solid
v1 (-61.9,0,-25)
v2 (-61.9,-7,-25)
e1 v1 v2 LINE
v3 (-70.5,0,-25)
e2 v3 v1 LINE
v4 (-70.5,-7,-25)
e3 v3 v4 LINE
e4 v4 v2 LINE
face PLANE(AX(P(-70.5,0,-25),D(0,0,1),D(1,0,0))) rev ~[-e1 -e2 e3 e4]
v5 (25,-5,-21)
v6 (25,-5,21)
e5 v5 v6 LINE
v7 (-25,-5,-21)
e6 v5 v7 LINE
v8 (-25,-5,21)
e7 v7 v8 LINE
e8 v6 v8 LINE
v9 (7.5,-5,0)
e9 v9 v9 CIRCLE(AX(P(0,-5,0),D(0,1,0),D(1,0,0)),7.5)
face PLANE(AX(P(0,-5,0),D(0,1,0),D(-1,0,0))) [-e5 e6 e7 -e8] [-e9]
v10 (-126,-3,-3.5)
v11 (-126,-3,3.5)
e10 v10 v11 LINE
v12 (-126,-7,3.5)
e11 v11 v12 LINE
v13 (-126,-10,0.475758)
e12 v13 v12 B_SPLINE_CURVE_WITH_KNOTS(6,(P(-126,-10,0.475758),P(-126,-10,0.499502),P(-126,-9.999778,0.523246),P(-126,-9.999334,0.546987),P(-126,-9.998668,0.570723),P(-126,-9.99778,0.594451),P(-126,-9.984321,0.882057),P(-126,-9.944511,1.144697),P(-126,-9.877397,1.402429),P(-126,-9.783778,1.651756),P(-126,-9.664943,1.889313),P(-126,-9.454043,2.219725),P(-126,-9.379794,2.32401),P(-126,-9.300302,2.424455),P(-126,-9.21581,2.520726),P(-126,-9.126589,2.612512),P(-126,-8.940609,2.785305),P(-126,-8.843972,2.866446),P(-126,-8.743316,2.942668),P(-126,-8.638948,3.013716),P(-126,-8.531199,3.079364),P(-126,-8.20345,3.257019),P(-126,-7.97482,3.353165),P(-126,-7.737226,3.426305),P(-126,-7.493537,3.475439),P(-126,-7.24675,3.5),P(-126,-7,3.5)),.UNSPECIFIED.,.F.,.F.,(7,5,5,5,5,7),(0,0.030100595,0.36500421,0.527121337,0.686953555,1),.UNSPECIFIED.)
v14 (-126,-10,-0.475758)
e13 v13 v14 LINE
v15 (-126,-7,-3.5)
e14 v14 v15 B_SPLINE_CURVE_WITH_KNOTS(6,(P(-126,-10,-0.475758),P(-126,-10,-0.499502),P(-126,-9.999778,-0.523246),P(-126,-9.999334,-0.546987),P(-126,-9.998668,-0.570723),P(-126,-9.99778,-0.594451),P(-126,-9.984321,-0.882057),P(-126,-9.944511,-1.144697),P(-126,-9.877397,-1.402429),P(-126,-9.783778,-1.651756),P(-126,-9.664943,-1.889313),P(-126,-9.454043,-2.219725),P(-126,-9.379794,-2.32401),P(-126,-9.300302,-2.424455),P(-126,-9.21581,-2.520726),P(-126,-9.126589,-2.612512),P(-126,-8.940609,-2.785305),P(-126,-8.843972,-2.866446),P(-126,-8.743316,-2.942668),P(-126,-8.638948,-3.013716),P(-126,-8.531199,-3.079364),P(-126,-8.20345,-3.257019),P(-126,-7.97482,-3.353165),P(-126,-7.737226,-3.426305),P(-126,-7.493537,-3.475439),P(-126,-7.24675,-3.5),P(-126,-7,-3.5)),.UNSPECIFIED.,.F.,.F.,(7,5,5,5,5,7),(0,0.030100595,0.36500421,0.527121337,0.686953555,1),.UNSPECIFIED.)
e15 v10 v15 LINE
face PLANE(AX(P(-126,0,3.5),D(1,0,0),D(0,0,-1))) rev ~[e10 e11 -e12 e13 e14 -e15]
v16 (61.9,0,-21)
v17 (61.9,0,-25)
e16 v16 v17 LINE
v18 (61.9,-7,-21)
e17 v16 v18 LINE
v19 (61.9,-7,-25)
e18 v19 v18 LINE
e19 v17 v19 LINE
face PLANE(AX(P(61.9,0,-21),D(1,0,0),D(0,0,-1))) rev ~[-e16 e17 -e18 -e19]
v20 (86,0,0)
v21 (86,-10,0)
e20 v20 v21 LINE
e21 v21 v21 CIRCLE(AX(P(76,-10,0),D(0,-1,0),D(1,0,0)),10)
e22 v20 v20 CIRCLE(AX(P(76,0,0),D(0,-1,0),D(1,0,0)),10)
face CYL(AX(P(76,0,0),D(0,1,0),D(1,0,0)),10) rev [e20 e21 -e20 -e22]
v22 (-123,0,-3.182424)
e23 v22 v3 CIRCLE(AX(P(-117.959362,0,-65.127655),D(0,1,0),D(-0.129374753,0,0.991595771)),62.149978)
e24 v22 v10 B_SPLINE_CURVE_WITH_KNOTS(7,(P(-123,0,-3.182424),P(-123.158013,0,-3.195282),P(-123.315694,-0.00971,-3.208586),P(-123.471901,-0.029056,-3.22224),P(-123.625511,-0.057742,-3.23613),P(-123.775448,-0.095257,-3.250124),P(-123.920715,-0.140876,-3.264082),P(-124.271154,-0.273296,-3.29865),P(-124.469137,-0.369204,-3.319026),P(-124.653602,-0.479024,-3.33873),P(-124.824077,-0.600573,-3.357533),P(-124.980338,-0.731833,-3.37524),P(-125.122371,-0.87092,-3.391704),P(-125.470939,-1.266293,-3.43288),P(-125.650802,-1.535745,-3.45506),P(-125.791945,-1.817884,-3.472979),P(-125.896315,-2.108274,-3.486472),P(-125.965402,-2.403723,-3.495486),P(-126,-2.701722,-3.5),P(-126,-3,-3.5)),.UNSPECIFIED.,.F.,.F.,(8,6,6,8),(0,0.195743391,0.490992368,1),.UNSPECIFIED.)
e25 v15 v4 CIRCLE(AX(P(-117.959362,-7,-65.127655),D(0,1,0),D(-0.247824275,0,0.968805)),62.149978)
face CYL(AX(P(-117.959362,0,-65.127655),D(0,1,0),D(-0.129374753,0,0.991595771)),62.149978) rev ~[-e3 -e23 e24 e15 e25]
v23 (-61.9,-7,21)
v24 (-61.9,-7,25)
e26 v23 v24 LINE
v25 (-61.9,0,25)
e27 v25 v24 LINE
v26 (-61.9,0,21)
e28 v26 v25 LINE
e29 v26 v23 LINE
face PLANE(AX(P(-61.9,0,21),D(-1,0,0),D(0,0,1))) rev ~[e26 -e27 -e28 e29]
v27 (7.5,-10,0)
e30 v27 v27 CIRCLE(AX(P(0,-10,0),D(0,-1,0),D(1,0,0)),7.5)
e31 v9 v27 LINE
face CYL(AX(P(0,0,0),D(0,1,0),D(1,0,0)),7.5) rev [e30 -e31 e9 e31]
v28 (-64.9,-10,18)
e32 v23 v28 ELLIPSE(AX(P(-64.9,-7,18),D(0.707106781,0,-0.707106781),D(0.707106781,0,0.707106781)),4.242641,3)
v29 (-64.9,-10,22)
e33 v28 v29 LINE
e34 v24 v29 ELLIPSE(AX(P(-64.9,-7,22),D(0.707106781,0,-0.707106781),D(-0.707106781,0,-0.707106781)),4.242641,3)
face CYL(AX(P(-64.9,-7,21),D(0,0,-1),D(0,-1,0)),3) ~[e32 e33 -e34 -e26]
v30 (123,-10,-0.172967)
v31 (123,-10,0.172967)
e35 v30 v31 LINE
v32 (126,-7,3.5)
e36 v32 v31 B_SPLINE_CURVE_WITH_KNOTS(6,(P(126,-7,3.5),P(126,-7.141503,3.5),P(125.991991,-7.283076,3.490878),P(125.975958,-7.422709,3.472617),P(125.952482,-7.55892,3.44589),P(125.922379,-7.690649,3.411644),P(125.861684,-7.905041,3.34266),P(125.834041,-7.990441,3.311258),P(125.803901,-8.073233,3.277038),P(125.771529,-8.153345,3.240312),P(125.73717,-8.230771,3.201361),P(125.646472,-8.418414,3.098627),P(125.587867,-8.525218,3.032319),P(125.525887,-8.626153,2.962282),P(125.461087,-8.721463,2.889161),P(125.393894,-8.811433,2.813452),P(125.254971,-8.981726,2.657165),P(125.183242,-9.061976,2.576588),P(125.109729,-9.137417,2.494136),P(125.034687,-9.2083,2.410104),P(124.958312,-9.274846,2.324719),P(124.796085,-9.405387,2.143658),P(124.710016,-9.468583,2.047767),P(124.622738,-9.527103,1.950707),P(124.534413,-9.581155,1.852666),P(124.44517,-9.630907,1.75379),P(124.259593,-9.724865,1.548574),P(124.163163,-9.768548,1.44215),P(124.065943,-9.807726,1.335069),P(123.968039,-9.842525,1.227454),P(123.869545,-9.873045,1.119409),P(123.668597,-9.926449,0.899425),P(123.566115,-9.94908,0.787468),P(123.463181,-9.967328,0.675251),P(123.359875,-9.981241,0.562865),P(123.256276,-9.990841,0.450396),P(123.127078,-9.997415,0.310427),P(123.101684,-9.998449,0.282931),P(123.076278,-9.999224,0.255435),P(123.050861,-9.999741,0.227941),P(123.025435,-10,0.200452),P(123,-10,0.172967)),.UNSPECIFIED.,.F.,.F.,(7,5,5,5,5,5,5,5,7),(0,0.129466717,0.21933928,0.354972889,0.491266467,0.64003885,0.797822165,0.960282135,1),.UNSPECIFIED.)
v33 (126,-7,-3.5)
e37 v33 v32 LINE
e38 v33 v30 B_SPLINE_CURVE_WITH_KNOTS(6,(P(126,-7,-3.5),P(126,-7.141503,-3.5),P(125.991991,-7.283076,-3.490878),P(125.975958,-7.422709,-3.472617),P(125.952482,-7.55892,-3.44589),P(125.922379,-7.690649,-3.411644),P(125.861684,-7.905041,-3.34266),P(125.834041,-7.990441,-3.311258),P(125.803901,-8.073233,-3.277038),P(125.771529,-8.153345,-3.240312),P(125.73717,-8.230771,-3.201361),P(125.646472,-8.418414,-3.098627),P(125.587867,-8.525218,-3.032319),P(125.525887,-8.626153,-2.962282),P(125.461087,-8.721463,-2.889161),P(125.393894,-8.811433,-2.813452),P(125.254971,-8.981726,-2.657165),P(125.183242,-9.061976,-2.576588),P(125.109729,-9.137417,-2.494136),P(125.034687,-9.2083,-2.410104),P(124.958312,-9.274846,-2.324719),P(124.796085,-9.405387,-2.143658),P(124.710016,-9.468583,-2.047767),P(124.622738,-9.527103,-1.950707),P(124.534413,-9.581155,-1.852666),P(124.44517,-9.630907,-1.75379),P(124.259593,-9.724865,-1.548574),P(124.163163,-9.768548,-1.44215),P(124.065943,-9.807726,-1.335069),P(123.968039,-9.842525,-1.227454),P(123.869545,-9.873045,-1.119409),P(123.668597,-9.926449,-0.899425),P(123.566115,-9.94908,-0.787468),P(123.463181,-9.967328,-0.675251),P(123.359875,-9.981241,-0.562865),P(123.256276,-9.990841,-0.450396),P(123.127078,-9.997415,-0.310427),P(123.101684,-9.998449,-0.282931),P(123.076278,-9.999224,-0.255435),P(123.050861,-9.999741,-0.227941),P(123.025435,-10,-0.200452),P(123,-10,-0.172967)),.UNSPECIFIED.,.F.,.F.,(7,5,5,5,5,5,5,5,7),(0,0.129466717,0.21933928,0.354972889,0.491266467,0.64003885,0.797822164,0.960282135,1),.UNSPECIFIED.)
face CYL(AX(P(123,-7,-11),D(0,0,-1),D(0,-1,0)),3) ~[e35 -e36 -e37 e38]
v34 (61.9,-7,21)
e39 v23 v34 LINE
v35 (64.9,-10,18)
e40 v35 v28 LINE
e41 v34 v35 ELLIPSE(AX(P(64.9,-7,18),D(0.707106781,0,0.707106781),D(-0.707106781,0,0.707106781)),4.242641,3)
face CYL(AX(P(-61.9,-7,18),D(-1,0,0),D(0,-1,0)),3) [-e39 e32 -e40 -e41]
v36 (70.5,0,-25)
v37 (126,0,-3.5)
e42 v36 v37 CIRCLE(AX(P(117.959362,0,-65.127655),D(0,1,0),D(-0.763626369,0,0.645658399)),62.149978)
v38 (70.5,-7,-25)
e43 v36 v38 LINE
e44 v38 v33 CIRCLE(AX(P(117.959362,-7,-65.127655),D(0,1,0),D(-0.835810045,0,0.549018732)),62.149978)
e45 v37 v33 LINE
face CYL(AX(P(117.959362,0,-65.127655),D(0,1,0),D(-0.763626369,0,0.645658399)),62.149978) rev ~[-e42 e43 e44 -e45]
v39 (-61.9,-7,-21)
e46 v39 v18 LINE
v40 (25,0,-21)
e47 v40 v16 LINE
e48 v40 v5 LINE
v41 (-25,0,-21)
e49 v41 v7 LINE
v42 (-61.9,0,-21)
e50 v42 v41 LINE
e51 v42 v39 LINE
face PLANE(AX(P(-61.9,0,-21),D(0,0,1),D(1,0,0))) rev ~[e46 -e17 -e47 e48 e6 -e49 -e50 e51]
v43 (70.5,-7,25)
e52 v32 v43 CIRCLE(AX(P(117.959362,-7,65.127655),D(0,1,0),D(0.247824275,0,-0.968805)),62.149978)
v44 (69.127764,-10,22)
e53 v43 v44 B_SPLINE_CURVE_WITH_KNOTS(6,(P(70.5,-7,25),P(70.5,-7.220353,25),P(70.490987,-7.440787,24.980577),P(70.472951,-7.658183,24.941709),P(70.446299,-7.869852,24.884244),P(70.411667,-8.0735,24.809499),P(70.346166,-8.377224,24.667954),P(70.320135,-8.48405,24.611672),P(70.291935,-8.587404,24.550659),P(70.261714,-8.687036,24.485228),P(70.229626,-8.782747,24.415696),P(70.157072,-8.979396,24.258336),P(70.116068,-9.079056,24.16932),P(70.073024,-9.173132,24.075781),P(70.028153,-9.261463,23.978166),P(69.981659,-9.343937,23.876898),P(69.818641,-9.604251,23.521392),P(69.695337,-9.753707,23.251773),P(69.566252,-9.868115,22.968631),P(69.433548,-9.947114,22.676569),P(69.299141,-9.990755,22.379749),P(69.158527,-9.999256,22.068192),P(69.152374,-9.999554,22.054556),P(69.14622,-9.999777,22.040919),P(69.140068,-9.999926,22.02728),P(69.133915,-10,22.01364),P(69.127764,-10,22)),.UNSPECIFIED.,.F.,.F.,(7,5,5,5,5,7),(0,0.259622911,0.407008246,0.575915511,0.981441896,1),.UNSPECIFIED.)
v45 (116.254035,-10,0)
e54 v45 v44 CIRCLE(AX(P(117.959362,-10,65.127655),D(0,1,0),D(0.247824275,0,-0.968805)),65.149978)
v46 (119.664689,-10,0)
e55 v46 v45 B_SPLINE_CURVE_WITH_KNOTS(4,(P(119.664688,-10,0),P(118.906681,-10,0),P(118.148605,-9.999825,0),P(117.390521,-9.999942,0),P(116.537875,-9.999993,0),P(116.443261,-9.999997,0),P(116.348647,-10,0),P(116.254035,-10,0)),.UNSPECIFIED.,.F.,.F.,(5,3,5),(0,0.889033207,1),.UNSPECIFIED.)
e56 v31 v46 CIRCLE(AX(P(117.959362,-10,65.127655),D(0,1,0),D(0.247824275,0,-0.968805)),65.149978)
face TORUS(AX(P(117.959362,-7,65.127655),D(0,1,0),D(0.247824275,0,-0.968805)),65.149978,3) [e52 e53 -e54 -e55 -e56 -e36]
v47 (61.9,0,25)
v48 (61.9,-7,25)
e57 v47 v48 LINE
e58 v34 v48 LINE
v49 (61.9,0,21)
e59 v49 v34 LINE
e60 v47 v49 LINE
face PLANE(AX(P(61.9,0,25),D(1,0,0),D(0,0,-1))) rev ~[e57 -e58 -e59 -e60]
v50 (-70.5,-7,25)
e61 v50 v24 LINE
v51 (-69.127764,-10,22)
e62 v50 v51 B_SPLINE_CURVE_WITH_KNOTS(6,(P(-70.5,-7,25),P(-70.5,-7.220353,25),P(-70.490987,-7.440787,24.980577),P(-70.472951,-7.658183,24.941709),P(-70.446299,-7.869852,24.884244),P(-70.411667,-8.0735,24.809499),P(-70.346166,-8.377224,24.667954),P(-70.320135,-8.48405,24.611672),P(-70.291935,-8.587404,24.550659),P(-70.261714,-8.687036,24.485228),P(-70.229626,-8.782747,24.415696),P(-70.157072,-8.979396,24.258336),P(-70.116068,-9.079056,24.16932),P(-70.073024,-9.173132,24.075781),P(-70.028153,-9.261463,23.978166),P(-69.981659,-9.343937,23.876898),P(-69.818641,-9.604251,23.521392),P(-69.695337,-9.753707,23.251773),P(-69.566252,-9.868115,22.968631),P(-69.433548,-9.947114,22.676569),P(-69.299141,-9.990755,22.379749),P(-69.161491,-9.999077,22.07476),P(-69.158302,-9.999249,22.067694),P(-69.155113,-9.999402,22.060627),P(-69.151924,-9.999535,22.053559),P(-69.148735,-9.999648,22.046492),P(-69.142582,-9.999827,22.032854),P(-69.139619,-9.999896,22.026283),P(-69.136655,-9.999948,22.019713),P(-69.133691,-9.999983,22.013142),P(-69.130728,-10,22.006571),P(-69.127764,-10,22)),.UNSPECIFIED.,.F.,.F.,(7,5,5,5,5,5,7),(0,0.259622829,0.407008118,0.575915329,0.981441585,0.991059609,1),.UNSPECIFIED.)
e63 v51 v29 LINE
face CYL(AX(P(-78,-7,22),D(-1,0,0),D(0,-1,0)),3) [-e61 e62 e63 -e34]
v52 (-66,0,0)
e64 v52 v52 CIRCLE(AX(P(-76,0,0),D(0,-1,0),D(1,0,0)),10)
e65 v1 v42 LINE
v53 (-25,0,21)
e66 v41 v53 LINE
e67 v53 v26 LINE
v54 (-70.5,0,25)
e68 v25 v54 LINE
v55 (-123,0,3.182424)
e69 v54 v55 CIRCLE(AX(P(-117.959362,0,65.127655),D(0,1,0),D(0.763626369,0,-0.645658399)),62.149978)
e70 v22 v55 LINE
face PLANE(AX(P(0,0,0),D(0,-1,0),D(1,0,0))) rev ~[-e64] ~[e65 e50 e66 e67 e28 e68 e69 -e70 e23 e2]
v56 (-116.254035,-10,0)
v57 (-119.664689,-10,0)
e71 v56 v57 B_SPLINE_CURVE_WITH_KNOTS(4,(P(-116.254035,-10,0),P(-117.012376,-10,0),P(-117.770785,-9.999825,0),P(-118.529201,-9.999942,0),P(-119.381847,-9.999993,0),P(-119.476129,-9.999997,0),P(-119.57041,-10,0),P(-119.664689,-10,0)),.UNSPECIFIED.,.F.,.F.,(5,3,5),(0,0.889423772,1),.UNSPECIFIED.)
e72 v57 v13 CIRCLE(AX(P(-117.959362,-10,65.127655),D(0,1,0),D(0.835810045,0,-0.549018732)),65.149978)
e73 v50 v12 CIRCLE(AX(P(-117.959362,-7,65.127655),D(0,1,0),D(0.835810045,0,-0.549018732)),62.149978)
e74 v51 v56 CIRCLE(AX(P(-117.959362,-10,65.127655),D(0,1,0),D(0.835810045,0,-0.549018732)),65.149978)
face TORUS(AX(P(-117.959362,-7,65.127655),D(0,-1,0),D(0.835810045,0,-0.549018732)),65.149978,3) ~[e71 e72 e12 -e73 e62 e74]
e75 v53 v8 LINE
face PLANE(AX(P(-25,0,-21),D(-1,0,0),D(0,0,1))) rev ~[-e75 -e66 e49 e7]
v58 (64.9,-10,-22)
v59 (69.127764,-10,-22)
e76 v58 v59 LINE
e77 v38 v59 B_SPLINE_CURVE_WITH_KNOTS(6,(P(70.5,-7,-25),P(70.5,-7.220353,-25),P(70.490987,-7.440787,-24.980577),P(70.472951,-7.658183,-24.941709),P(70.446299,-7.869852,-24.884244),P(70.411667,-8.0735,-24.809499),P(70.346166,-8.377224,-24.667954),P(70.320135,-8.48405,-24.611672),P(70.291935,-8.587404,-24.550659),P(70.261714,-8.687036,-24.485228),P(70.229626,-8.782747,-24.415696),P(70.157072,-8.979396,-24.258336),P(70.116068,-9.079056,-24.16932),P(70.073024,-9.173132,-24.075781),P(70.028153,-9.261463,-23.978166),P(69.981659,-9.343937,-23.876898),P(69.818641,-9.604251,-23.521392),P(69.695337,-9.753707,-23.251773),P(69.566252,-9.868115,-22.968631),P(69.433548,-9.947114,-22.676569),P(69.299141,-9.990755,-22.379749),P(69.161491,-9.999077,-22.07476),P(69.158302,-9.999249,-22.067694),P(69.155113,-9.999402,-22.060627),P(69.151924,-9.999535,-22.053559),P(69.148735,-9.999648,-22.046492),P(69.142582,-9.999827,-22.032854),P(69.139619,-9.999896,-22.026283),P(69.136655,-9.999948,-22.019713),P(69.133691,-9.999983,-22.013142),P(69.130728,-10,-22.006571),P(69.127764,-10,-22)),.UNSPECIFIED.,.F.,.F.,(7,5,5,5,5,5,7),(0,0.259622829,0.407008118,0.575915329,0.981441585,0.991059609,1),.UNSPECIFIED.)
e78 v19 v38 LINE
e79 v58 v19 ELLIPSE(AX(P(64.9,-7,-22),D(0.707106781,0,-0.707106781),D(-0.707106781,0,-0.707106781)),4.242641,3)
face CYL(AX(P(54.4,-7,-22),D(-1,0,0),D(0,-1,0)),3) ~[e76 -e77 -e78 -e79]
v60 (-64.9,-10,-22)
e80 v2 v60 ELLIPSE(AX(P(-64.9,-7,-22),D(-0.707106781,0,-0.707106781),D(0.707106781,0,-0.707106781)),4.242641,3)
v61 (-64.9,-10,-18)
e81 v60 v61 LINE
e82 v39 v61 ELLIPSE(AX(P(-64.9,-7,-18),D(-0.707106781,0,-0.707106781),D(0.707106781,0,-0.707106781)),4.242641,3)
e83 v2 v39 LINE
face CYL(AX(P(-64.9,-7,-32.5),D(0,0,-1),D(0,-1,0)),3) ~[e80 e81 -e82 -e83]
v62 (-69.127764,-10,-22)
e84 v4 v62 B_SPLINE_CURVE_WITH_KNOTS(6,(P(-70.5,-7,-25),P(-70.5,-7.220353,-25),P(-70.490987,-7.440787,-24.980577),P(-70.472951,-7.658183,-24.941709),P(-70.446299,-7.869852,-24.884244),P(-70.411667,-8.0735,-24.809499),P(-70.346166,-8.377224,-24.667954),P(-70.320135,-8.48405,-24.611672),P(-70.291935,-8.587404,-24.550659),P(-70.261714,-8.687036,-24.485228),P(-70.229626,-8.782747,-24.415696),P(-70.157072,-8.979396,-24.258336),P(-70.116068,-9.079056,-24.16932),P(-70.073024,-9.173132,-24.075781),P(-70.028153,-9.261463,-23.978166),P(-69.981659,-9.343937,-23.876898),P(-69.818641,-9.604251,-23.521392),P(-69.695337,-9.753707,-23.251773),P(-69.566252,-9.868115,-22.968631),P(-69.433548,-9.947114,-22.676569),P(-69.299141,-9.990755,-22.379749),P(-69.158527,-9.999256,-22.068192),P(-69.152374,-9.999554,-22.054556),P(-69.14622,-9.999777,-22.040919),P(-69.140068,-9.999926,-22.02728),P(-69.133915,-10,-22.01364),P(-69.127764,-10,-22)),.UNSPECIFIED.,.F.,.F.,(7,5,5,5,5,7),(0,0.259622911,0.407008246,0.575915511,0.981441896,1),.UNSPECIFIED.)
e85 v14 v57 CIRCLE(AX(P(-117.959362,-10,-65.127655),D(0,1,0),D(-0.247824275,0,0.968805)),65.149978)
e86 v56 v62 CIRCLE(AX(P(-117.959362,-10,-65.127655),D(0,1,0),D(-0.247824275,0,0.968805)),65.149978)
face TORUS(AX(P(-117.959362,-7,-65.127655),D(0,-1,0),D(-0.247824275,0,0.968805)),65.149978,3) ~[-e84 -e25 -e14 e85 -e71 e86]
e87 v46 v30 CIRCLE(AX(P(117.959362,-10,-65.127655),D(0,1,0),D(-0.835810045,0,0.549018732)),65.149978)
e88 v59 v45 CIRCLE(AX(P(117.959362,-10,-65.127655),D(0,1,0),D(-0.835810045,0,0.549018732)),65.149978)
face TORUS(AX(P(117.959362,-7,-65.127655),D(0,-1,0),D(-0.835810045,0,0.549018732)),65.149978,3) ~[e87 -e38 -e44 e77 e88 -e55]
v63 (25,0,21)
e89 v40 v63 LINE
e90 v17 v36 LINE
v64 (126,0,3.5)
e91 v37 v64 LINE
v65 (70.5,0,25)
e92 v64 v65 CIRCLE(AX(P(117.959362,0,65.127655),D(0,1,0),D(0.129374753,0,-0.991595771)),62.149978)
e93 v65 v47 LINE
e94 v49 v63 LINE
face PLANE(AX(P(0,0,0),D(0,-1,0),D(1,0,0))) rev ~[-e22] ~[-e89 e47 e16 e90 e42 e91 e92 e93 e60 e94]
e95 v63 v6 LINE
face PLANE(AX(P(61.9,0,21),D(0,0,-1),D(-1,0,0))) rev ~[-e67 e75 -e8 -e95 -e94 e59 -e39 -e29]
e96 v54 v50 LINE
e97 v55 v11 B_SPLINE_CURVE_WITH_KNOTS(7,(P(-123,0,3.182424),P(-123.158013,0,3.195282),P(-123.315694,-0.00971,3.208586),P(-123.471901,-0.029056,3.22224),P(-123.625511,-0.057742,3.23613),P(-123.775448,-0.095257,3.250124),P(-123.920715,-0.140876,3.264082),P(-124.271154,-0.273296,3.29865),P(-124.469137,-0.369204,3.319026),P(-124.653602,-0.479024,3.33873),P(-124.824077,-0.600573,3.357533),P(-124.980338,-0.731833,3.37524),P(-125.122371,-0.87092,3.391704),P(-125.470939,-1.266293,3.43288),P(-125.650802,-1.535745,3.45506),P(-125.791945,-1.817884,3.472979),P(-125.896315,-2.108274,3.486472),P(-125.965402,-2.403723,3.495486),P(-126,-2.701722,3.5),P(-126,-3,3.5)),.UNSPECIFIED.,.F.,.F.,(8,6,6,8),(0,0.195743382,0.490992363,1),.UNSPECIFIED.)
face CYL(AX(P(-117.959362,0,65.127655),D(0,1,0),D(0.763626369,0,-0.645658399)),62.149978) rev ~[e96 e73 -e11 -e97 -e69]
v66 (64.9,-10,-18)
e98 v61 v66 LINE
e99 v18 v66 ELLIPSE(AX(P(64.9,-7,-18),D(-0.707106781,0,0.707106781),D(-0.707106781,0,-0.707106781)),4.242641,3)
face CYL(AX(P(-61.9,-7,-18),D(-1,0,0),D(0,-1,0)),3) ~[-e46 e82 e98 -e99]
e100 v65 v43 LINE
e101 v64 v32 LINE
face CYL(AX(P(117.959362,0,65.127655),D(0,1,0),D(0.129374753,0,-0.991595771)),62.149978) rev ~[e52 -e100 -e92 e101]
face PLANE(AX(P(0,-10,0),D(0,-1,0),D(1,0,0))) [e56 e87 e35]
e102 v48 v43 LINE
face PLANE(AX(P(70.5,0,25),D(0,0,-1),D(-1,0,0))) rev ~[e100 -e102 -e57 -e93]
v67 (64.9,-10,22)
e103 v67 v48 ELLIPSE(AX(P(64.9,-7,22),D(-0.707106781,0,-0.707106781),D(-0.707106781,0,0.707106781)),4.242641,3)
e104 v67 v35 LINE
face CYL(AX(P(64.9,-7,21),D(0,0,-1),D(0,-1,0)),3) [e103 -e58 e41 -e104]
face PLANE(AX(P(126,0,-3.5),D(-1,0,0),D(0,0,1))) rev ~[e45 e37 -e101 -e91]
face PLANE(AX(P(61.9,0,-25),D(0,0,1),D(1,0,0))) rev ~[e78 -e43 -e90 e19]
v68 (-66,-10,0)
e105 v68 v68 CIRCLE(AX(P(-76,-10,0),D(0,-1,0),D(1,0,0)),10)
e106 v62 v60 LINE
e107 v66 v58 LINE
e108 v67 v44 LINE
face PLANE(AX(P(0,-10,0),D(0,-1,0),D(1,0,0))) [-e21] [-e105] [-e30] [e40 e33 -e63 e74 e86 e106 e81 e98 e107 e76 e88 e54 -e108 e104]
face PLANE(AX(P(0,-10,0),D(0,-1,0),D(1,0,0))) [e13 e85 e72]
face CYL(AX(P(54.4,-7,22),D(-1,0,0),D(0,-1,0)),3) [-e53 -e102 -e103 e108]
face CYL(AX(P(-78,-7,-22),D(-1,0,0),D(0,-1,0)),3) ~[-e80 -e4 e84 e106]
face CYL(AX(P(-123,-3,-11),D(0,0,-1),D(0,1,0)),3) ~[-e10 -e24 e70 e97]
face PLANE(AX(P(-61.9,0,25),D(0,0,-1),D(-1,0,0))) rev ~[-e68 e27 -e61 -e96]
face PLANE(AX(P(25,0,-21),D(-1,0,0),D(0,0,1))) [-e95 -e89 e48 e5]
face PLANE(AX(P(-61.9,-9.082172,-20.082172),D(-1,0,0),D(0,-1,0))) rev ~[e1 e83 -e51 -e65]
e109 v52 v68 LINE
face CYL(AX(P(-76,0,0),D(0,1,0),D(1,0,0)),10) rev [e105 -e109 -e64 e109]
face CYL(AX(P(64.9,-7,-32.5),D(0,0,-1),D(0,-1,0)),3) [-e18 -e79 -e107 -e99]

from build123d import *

# Parameters (mm, degrees)
F0_R         = 10
F0_R_2       = 7.5
F1_DEPTH     = 10
F2_W         = 50
F2_H         = 42
F2_R         = 7.5
F3_DEPTH     = 5
F4_T1_DEPTH  = 123.8
F4_T3_DEPTH  = 11.5
F4_T5_DEPTH  = 23.6
F4_T7_DEPTH  = 22
F4_T9_DEPTH  = 11.5
F4_T11_DEPTH = 23.6
F4_T14_ANGLE = 71.0490813257
F4_T16_ANGLE = 71.0490813257
F4_T18_ANGLE = 71.0490813257
F4_T20_ANGLE = 71.0490813257
F4_T25_DEPTH = 19
F4_T29_DEPTH = 131.3
F4_T36_DEPTH = 131.3
F4_T40_DEPTH = 19
F4_T47_DEPTH = 19
F4_T51_DEPTH = 131.3
F4_T58_DEPTH = 131.3
F4_T62_DEPTH = 19


# Not quite as in the source:
# - a fillet or chamfer that OpenCascade refuses, or shapes differently, is made with other operations: its cross-section is extruded or revolved along the edge and cut away or added


with BuildPart() as f1:
    # F0 (on Front) → F1 (new body)
    with BuildSketch(Plane.XZ):
        with BuildLine():
            ThreePointArc((126, 3.5), (95.5089399385, 7.1742403064), (70.5, 25))
            Line((70.5, 25), (61.9, 25))
            Line((61.9, 25), (61.9, 21))
            Line((61.9, 21), (-61.9, 21))
            Line((-61.9, 21), (-61.9, 25))
            Line((-61.9, 25), (-70.5, 25))
            ThreePointArc((-70.5, 25), (-95.5089399385, 7.1742403064), (-126, 3.5))
            Line((-126, 3.5), (-126, -3.5))
            ThreePointArc((-126, -3.5), (-95.5089399385, -7.1742403064), (-70.5, -25))
            Line((-70.5, -25), (-61.9, -25))
            Line((-61.9, -25), (-61.9, -21))
            Line((-61.9, -21), (61.9, -21))
            Line((61.9, -21), (61.9, -25))
            Line((61.9, -25), (70.5, -25))
            ThreePointArc((70.5, -25), (95.5089399385, -7.1742403064), (126, -3.5))
            Line((126, -3.5), (126, 3.5))
        make_face()
        with Locations((-76, 0)):
            Circle(F0_R, mode=Mode.SUBTRACT)
        Circle(F0_R_2, mode=Mode.SUBTRACT)
        with Locations((76, 0)):
            Circle(F0_R, mode=Mode.SUBTRACT)
    extrude(amount=F1_DEPTH)

    # F2 (on face) → F3 (cut)
    with BuildSketch(Plane(origin=(0, 0, 0), x_dir=(-1, 0, 0), z_dir=(0, 1, 0))):
        Rectangle(F2_W, F2_H)
        Circle(F2_R, mode=Mode.SUBTRACT)
    extrude(amount=-F3_DEPTH, mode=Mode.SUBTRACT)

    # F4: fillet of radius 3 on 16 edges, made by hand

    # F4_s2 → F4_t1 (cut)
    with BuildSketch(Plane.YZ.offset(-61.9)):
        with BuildLine():
            ThreePointArc((-10, -18), (-9.1213203436, -20.1213203436), (-7, -21))
            Line((-7, -21), (-10, -21))
            Line((-10, -21), (-10, -18))
        make_face()
        with BuildLine():
            ThreePointArc((-10, 18), (-9.1213203436, 20.1213203436), (-7, 21))
            Line((-7, 21), (-10, 21))
            Line((-10, 21), (-10, 18))
        make_face()
    extrude(amount=F4_T1_DEPTH, mode=Mode.SUBTRACT)

    # F4_s4 → F4_t3 (cut)
    with BuildSketch(Plane.XY.offset(-32.5)):
        with BuildLine():
            ThreePointArc((64.9, -10), (62.7786796564, -9.1213203436), (61.9, -7))
            Line((61.9, -7), (61.9, -10))
            Line((61.9, -10), (64.9, -10))
        make_face()
        with BuildLine():
            ThreePointArc((-64.9, -10), (-62.7786796564, -9.1213203436), (-61.9, -7))
            Line((-61.9, -7), (-61.9, -10))
            Line((-61.9, -10), (-64.9, -10))
        make_face()
    extrude(amount=F4_T3_DEPTH, mode=Mode.SUBTRACT)

    # F4_s6 → F4_t5 (cut)
    with BuildSketch(Plane.YZ.offset(54.4)):
        with BuildLine():
            ThreePointArc((-10, -22), (-9.1213203436, -24.1213203436), (-7, -25))
            Line((-7, -25), (-10, -25))
            Line((-10, -25), (-10, -22))
        make_face()
        with BuildLine():
            ThreePointArc((-10, 22), (-9.1213203436, 24.1213203436), (-7, 25))
            Line((-7, 25), (-10, 25))
            Line((-10, 25), (-10, 22))
        make_face()
    extrude(amount=F4_T5_DEPTH, mode=Mode.SUBTRACT)

    # F4_s8 → F4_t7 (cut)
    with BuildSketch(Plane.XY.offset(-11)):
        with BuildLine():
            ThreePointArc((123, -10), (125.1213203436, -9.1213203436), (126, -7))
            Line((126, -7), (126, -10))
            Line((126, -10), (123, -10))
        make_face()
        with BuildLine():
            ThreePointArc((-123, 0), (-125.1213203436, -0.8786796564), (-126, -3))
            Line((-126, -3), (-126, 0))
            Line((-126, 0), (-123, 0))
        make_face()
    extrude(amount=F4_T7_DEPTH, mode=Mode.SUBTRACT)

    # F4_s10 → F4_t9 (cut)
    with BuildSketch(Plane.XY.offset(21)):
        with BuildLine():
            ThreePointArc((64.9, -10), (62.7786796564, -9.1213203436), (61.9, -7))
            Line((61.9, -7), (61.9, -10))
            Line((61.9, -10), (64.9, -10))
        make_face()
        with BuildLine():
            ThreePointArc((-64.9, -10), (-62.7786796564, -9.1213203436), (-61.9, -7))
            Line((-61.9, -7), (-61.9, -10))
            Line((-61.9, -10), (-64.9, -10))
        make_face()
    extrude(amount=F4_T9_DEPTH, mode=Mode.SUBTRACT)

    # F4_s12 → F4_t11 (cut)
    with BuildSketch(Plane.YZ.offset(-78)):
        with BuildLine():
            ThreePointArc((-10, 22), (-9.1213203436, 24.1213203436), (-7, 25))
            Line((-7, 25), (-10, 25))
            Line((-10, 25), (-10, 22))
        make_face()
        with BuildLine():
            ThreePointArc((-10, -22), (-9.1213203436, -24.1213203436), (-7, -25))
            Line((-7, -25), (-10, -25))
            Line((-10, -25), (-10, -22))
        make_face()
    extrude(amount=F4_T11_DEPTH, mode=Mode.SUBTRACT)

    # F4_s13 → F4_t14 (revolve, cut)
    with BuildSketch(Plane(origin=(5.6700188901, 0, 8.6318707647), x_dir=(0, 1, 0), z_dir=(-0.5490187323, 0, -0.8358100452))):
        with BuildLine():
            ThreePointArc((-10, 69.1979444633), (-9.1213203436, 71.3192648069), (-7, 72.1979444633))
            Line((-7, 72.1979444633), (-10, 72.1979444633))
            Line((-10, 72.1979444633), (-10, 69.1979444633))
        make_face()
    revolve(axis=Axis((117.9593619468, -10, -65.127655258), (0, 1, 0)), revolution_arc=F4_T14_ANGLE, mode=Mode.SUBTRACT)

    # F4_s15 → F4_t16 (revolve, cut)
    with BuildSketch(Plane(origin=(126.3513869763, 0, 32.3212006938), x_dir=(0, 1, 0), z_dir=(0.9688050004, 0, 0.2478242748))):
        with BuildLine():
            ThreePointArc((-7, -28.2871731549), (-9.1213203436, -29.1658528113), (-10, -31.2871731549))
            Line((-10, -31.2871731549), (-10, -28.2871731549))
            Line((-10, -28.2871731549), (-7, -28.2871731549))
        make_face()
    revolve(axis=Axis((117.9593619468, -10, 65.127655258), (0, 1, 0)), revolution_arc=F4_T16_ANGLE, mode=Mode.SUBTRACT)

    # F4_s17 → F4_t18 (revolve, cut)
    with BuildSketch(Plane(origin=(-5.6700188901, 0, -8.6318707647), x_dir=(0, 1, 0), z_dir=(0.5490187323, 0, 0.8358100452))):
        with BuildLine():
            ThreePointArc((-10, 69.1979444633), (-9.1213203436, 71.3192648069), (-7, 72.1979444633))
            Line((-7, 72.1979444633), (-10, 72.1979444633))
            Line((-10, 72.1979444633), (-10, 69.1979444633))
        make_face()
    revolve(axis=Axis((-117.9593619468, -10, 65.127655258), (0, 1, 0)), revolution_arc=F4_T18_ANGLE, mode=Mode.SUBTRACT)

    # F4_s19 → F4_t20 (revolve, cut)
    with BuildSketch(Plane(origin=(-126.3513869763, 0, -32.3212006938), x_dir=(0, 1, 0), z_dir=(-0.9688050004, 0, -0.2478242748))):
        with BuildLine():
            ThreePointArc((-10, -31.2871731549), (-9.1213203436, -29.1658528113), (-7, -28.2871731549))
            Line((-7, -28.2871731549), (-10, -28.2871731549))
            Line((-10, -28.2871731549), (-10, -31.2871731549))
        make_face()
    revolve(axis=Axis((-117.9593619468, -10, -65.127655258), (0, 1, 0)), revolution_arc=F4_T20_ANGLE, mode=Mode.SUBTRACT)


with BuildPart() as f4_tool23:
    # F4_s24 → F4_t25 (new body)
    with BuildSketch(Plane.XY.offset(-32.5)):
        with BuildLine():
            ThreePointArc((-64.9, -10), (-62.7786796564, -9.1213203436), (-61.9, -7))
            Line((-61.9, -7), (-61.9, -10))
            Line((-61.9, -10), (-64.9, -10))
        make_face()
    extrude(amount=F4_T25_DEPTH)

    split(bisect_by=Plane.XY.offset(-21), keep=Keep.TOP)


with BuildPart() as f4_tool27:
    # F4_s28 → F4_t29 (new body)
    with BuildSketch(Plane.YZ.offset(-69.4)):
        with BuildLine():
            ThreePointArc((-10, -18), (-9.1213203436, -20.1213203436), (-7, -21))
            Line((-7, -21), (-10, -21))
            Line((-10, -21), (-10, -18))
        make_face()
    extrude(amount=F4_T29_DEPTH)

    split(bisect_by=Plane.YZ.offset(-61.9), keep=Keep.BOTTOM)


with BuildPart() as f4_tool23_1:
    add(f4_tool23.part)

    # F4_t31: intersect F4_tool27
    add(f4_tool27.part, mode=Mode.INTERSECT)


with BuildPart() as f1_1:
    add(f1.part)

    # F4_t21: cut F4_tool23
    add(f4_tool23_1.part, mode=Mode.SUBTRACT)


with BuildPart() as f4_tool34:
    # F4_s35 → F4_t36 (new body)
    with BuildSketch(Plane.YZ.offset(-61.9)):
        with BuildLine():
            ThreePointArc((-10, -18), (-9.1213203436, -20.1213203436), (-7, -21))
            Line((-7, -21), (-10, -21))
            Line((-10, -21), (-10, -18))
        make_face()
    extrude(amount=F4_T36_DEPTH)

    split(bisect_by=Plane.YZ.offset(61.9), keep=Keep.TOP)


with BuildPart() as f4_tool38:
    # F4_s39 → F4_t40 (new body)
    with BuildSketch(Plane.XY.offset(-13.5)):
        with BuildLine():
            ThreePointArc((64.9, -10), (62.7786796564, -9.1213203436), (61.9, -7))
            Line((61.9, -7), (61.9, -10))
            Line((61.9, -10), (64.9, -10))
        make_face()
    extrude(amount=-F4_T40_DEPTH)

    split(bisect_by=Plane.XY.offset(-21), keep=Keep.TOP)


with BuildPart() as f4_tool34_1:
    add(f4_tool34.part)

    # F4_t42: intersect F4_tool38
    add(f4_tool38.part, mode=Mode.INTERSECT)


with BuildPart() as f1_2:
    add(f1_1.part)

    # F4_t32: cut F4_tool34
    add(f4_tool34_1.part, mode=Mode.SUBTRACT)


with BuildPart() as f4_tool45:
    # F4_s46 → F4_t47 (new body)
    with BuildSketch(Plane.XY.offset(32.5)):
        with BuildLine():
            ThreePointArc((64.9, -10), (62.7786796564, -9.1213203436), (61.9, -7))
            Line((61.9, -7), (61.9, -10))
            Line((61.9, -10), (64.9, -10))
        make_face()
    extrude(amount=-F4_T47_DEPTH)

    split(bisect_by=Plane.XY.offset(21), keep=Keep.BOTTOM)


with BuildPart() as f4_tool49:
    # F4_s50 → F4_t51 (new body)
    with BuildSketch(Plane.YZ.offset(69.4)):
        with BuildLine():
            ThreePointArc((-10, 18), (-9.1213203436, 20.1213203436), (-7, 21))
            Line((-7, 21), (-10, 21))
            Line((-10, 21), (-10, 18))
        make_face()
    extrude(amount=-F4_T51_DEPTH)

    split(bisect_by=Plane.YZ.offset(61.9), keep=Keep.TOP)


with BuildPart() as f4_tool45_1:
    add(f4_tool45.part)

    # F4_t53: intersect F4_tool49
    add(f4_tool49.part, mode=Mode.INTERSECT)


with BuildPart() as f1_3:
    add(f1_2.part)

    # F4_t43: cut F4_tool45
    add(f4_tool45_1.part, mode=Mode.SUBTRACT)


with BuildPart() as f4_tool56:
    # F4_s57 → F4_t58 (new body)
    with BuildSketch(Plane.YZ.offset(61.9)):
        with BuildLine():
            ThreePointArc((-10, 18), (-9.1213203436, 20.1213203436), (-7, 21))
            Line((-7, 21), (-10, 21))
            Line((-10, 21), (-10, 18))
        make_face()
    extrude(amount=-F4_T58_DEPTH)

    split(bisect_by=Plane.YZ.offset(-61.9), keep=Keep.BOTTOM)


with BuildPart() as f4_tool60:
    # F4_s61 → F4_t62 (new body)
    with BuildSketch(Plane.XY.offset(13.5)):
        with BuildLine():
            ThreePointArc((-64.9, -10), (-62.7786796564, -9.1213203436), (-61.9, -7))
            Line((-61.9, -7), (-61.9, -10))
            Line((-61.9, -10), (-64.9, -10))
        make_face()
    extrude(amount=F4_T62_DEPTH)

    split(bisect_by=Plane.XY.offset(21), keep=Keep.BOTTOM)


with BuildPart() as f4_tool56_1:
    add(f4_tool56.part)

    # F4_t64: intersect F4_tool60
    add(f4_tool60.part, mode=Mode.INTERSECT)


with BuildPart() as f1_4:
    add(f1_3.part)

    # F4_t54: cut F4_tool56
    add(f4_tool56_1.part, mode=Mode.SUBTRACT)


solid = f1_4.part
